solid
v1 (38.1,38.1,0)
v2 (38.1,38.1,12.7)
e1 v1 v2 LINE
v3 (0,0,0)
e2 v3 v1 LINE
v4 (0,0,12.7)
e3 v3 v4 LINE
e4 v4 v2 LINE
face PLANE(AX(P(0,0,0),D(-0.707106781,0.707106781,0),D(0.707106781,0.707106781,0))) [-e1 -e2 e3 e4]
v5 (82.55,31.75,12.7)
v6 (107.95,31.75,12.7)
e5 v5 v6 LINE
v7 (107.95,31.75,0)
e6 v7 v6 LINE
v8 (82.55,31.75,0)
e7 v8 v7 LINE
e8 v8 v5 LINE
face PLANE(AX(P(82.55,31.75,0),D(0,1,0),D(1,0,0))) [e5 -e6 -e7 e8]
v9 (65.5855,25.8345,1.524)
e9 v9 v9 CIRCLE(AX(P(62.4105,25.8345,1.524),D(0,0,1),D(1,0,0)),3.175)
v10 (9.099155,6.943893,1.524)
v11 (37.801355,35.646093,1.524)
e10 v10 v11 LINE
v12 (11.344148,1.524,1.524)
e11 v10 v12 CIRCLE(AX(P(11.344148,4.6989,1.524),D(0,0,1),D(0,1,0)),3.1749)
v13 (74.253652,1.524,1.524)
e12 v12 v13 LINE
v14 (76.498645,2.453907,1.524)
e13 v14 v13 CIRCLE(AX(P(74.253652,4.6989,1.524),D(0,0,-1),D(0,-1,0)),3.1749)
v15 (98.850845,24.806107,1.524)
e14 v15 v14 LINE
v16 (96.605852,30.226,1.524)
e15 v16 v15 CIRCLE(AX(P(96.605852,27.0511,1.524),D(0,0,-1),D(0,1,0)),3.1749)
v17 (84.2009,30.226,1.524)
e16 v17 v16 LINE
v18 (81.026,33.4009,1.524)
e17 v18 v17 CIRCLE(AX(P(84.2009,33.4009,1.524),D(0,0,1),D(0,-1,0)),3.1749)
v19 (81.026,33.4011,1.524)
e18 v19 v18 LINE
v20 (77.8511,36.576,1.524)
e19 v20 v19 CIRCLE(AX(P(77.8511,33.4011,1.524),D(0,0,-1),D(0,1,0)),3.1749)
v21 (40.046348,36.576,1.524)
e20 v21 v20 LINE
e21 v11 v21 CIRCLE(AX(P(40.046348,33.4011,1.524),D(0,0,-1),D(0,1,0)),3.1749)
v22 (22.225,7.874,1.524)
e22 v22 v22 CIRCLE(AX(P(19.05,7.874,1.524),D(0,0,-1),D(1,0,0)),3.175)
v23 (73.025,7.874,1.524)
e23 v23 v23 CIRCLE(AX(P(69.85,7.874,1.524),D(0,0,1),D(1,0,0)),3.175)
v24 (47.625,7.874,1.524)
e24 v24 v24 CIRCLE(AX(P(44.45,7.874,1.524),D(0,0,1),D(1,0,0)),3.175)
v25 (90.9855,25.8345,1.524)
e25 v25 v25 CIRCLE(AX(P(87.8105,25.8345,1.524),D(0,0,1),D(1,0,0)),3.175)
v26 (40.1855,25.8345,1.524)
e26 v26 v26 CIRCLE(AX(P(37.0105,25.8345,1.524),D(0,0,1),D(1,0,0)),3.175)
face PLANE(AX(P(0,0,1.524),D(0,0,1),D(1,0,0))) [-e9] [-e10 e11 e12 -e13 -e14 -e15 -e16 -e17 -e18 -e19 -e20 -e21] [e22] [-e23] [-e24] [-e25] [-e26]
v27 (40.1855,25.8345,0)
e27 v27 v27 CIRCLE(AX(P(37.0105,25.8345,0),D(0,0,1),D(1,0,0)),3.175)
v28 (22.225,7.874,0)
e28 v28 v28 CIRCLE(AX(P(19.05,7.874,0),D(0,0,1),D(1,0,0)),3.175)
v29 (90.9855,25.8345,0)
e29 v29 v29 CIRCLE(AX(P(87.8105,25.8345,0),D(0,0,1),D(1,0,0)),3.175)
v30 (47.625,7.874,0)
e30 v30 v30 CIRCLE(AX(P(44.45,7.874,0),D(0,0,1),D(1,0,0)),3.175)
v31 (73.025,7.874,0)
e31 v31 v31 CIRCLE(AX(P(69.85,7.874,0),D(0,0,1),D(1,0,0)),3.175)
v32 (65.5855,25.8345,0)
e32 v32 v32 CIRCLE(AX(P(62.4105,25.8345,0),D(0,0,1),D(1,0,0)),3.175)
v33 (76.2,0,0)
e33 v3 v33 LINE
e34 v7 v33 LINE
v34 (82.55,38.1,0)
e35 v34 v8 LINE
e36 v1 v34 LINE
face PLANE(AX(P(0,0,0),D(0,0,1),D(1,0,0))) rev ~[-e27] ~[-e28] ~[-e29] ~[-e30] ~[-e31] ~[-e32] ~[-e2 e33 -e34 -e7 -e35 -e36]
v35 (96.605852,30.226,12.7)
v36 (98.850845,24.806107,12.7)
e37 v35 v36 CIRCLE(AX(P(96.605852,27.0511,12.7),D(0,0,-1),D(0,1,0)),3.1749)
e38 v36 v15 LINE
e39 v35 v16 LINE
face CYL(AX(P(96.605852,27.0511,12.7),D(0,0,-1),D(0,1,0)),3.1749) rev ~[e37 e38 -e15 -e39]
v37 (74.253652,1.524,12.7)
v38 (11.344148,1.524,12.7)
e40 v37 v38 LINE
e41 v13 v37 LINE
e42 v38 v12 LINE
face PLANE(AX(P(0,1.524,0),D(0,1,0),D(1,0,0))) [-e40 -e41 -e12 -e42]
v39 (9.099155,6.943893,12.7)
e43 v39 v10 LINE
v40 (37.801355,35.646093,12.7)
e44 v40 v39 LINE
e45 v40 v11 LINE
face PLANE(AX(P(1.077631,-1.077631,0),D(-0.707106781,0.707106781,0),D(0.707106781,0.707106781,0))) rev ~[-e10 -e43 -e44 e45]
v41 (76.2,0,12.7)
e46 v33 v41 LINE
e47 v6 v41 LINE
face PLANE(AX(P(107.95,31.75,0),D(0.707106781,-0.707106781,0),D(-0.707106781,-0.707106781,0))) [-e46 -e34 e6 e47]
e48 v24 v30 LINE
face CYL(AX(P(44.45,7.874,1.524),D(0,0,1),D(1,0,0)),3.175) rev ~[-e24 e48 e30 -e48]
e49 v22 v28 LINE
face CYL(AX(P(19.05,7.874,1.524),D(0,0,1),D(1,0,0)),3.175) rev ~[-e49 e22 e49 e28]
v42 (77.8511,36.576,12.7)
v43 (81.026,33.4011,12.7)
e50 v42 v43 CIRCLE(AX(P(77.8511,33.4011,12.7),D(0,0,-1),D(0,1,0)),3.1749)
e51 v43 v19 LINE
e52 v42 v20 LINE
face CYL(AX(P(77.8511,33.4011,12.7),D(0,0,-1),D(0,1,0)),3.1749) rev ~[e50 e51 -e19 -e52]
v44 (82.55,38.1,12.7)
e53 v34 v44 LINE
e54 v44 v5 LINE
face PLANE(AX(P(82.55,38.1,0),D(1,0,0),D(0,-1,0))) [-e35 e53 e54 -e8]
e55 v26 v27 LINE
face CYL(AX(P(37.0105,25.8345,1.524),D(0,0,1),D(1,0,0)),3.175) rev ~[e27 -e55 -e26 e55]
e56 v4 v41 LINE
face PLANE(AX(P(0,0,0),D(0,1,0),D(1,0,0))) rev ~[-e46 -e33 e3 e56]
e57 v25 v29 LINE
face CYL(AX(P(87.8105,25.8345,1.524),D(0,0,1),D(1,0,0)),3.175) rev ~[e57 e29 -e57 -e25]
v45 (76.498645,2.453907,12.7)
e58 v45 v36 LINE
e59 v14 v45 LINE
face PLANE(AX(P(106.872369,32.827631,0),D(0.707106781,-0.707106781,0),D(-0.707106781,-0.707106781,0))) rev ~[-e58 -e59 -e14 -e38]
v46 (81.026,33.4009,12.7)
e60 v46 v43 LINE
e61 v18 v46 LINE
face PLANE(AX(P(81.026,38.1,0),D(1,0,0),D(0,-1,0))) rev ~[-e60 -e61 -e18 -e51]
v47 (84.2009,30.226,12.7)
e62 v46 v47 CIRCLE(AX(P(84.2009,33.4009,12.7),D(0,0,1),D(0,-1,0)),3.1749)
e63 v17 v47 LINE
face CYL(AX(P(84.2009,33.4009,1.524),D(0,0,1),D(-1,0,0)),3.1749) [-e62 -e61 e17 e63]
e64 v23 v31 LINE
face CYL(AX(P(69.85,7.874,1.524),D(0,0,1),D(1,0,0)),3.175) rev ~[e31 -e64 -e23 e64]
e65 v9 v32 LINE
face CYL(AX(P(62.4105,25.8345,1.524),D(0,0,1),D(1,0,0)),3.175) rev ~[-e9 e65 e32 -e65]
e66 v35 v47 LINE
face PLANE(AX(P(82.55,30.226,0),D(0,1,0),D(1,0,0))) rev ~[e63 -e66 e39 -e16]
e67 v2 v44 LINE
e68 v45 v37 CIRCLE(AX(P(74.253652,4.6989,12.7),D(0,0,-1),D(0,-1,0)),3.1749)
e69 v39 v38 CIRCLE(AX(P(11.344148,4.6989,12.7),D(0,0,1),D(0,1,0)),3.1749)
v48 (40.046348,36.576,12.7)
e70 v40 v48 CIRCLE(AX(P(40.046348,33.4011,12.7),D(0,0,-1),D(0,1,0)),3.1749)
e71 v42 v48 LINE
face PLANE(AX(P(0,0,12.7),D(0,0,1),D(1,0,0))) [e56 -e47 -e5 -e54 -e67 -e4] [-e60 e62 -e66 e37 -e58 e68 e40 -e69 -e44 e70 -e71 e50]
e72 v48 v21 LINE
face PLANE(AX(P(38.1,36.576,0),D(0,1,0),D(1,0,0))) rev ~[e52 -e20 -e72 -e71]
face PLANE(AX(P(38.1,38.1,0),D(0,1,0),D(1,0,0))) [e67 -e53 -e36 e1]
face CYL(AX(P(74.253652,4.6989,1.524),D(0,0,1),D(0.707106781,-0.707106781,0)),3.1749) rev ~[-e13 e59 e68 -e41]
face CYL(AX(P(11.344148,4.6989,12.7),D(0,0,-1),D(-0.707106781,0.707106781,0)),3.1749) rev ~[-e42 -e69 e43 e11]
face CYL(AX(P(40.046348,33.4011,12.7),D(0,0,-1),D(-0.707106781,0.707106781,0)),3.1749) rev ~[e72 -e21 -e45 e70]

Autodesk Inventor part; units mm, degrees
ref_plane "YZ Plane" through (0, 0, 0) normal (1, 0, 0) x (0, 1, 0)
ref_plane "XZ Plane" through (0, 0, 0) normal (0, 1, 0) x (-1, 0, 0)
ref_plane "XY Plane" through (0, 0, 0) normal (0, 0, 1) x (1, 0, 0)
sketch "Sketch1" plane through (0, 0, 0) normal (0, 0, 1) x (1, 0, 0)
  line L0 (-21.59, 0) -> (129.54, 0) projected
  line L1 (0, -7.62) -> (0, 45.72) projected
  line L2 (0, 0) -> (38.1, 38.1)
  line L3 (38.1, 38.1) -> (82.55, 38.1)
  line L4 (82.55, 38.1) -> (82.55, 31.75)
  line L5 (82.55, 31.75) -> (107.95, 31.75)
  line L6 (107.95, 31.75) -> (76.2, 0)
  line L7 (0, 0) -> (76.2, 0)
  dimension "d0" = 38.1
  dimension "d1" = 45
  dimension "d2" = 76.2
  dimension "d3" = 25.4
  dimension "d27" = 6.35
sketch "Sketch2" plane through (0, 0, 0) normal (0, 0, 1) x (1, 0, 0)
  point P0 (0, 0)
extrude "Extrusion1" add sketch "Sketch1" along normal blind 12.7
shell "Shell1" thickness 1.524 removed faces 1 at (38.1, 12.7, 12.7)
fillet "Fillet1" radius 3.175 6 edges at (38.7313, 36.576, 7.112) (81.026, 36.576, 7.112) (81.026, 30.226, 7.112) (104.2707, 30.226, 7.112) (75.5687, 1.524, 7.112) (3.6793, 1.524, 7.112)
sketch "Sketch3" plane through (11.3444, 1.524, 1.524) normal (0, 0, 1) x (1, 0, 0)
  line L0 (-11.3444, -1.524) -> (64.8556, -1.524) projected
  line L1 (-11.3444, -1.524) -> (7.7056, -1.524)
  line L2 (7.7056, -1.524) -> (7.7056, 6.35)
  circle A0 centre (7.7056, 6.35) radius 3.175
  line L3 (7.7056, 6.35) -> (25.6661, 24.3105) construction
  line L4 (-2.2451, 5.4201) -> (26.4569, 34.1221) projected
  circle A1 centre (25.6661, 24.3105) radius 3.175
  circle A2 centre (33.1056, 6.35) radius 3.175
  circle A3 centre (58.5056, 6.35) radius 3.175
  circle A4 centre (51.0661, 24.3105) radius 3.175
  circle A5 centre (76.4661, 24.3105) radius 3.175
  dimension "d32" = 19.05
  dimension "d33" = 7.874
  dimension "d35" = 25.4
  dimension "d41" = 25.4
  dimension "d42" = 25.4
  dimension "d46" = 6.35
  dimension "d47" = 25.4
  dimension "d48" = 25.4
extrude "Extrusion2" cut sketch "Sketch3" against normal through all
properties part number "Ch4 Part 1"
